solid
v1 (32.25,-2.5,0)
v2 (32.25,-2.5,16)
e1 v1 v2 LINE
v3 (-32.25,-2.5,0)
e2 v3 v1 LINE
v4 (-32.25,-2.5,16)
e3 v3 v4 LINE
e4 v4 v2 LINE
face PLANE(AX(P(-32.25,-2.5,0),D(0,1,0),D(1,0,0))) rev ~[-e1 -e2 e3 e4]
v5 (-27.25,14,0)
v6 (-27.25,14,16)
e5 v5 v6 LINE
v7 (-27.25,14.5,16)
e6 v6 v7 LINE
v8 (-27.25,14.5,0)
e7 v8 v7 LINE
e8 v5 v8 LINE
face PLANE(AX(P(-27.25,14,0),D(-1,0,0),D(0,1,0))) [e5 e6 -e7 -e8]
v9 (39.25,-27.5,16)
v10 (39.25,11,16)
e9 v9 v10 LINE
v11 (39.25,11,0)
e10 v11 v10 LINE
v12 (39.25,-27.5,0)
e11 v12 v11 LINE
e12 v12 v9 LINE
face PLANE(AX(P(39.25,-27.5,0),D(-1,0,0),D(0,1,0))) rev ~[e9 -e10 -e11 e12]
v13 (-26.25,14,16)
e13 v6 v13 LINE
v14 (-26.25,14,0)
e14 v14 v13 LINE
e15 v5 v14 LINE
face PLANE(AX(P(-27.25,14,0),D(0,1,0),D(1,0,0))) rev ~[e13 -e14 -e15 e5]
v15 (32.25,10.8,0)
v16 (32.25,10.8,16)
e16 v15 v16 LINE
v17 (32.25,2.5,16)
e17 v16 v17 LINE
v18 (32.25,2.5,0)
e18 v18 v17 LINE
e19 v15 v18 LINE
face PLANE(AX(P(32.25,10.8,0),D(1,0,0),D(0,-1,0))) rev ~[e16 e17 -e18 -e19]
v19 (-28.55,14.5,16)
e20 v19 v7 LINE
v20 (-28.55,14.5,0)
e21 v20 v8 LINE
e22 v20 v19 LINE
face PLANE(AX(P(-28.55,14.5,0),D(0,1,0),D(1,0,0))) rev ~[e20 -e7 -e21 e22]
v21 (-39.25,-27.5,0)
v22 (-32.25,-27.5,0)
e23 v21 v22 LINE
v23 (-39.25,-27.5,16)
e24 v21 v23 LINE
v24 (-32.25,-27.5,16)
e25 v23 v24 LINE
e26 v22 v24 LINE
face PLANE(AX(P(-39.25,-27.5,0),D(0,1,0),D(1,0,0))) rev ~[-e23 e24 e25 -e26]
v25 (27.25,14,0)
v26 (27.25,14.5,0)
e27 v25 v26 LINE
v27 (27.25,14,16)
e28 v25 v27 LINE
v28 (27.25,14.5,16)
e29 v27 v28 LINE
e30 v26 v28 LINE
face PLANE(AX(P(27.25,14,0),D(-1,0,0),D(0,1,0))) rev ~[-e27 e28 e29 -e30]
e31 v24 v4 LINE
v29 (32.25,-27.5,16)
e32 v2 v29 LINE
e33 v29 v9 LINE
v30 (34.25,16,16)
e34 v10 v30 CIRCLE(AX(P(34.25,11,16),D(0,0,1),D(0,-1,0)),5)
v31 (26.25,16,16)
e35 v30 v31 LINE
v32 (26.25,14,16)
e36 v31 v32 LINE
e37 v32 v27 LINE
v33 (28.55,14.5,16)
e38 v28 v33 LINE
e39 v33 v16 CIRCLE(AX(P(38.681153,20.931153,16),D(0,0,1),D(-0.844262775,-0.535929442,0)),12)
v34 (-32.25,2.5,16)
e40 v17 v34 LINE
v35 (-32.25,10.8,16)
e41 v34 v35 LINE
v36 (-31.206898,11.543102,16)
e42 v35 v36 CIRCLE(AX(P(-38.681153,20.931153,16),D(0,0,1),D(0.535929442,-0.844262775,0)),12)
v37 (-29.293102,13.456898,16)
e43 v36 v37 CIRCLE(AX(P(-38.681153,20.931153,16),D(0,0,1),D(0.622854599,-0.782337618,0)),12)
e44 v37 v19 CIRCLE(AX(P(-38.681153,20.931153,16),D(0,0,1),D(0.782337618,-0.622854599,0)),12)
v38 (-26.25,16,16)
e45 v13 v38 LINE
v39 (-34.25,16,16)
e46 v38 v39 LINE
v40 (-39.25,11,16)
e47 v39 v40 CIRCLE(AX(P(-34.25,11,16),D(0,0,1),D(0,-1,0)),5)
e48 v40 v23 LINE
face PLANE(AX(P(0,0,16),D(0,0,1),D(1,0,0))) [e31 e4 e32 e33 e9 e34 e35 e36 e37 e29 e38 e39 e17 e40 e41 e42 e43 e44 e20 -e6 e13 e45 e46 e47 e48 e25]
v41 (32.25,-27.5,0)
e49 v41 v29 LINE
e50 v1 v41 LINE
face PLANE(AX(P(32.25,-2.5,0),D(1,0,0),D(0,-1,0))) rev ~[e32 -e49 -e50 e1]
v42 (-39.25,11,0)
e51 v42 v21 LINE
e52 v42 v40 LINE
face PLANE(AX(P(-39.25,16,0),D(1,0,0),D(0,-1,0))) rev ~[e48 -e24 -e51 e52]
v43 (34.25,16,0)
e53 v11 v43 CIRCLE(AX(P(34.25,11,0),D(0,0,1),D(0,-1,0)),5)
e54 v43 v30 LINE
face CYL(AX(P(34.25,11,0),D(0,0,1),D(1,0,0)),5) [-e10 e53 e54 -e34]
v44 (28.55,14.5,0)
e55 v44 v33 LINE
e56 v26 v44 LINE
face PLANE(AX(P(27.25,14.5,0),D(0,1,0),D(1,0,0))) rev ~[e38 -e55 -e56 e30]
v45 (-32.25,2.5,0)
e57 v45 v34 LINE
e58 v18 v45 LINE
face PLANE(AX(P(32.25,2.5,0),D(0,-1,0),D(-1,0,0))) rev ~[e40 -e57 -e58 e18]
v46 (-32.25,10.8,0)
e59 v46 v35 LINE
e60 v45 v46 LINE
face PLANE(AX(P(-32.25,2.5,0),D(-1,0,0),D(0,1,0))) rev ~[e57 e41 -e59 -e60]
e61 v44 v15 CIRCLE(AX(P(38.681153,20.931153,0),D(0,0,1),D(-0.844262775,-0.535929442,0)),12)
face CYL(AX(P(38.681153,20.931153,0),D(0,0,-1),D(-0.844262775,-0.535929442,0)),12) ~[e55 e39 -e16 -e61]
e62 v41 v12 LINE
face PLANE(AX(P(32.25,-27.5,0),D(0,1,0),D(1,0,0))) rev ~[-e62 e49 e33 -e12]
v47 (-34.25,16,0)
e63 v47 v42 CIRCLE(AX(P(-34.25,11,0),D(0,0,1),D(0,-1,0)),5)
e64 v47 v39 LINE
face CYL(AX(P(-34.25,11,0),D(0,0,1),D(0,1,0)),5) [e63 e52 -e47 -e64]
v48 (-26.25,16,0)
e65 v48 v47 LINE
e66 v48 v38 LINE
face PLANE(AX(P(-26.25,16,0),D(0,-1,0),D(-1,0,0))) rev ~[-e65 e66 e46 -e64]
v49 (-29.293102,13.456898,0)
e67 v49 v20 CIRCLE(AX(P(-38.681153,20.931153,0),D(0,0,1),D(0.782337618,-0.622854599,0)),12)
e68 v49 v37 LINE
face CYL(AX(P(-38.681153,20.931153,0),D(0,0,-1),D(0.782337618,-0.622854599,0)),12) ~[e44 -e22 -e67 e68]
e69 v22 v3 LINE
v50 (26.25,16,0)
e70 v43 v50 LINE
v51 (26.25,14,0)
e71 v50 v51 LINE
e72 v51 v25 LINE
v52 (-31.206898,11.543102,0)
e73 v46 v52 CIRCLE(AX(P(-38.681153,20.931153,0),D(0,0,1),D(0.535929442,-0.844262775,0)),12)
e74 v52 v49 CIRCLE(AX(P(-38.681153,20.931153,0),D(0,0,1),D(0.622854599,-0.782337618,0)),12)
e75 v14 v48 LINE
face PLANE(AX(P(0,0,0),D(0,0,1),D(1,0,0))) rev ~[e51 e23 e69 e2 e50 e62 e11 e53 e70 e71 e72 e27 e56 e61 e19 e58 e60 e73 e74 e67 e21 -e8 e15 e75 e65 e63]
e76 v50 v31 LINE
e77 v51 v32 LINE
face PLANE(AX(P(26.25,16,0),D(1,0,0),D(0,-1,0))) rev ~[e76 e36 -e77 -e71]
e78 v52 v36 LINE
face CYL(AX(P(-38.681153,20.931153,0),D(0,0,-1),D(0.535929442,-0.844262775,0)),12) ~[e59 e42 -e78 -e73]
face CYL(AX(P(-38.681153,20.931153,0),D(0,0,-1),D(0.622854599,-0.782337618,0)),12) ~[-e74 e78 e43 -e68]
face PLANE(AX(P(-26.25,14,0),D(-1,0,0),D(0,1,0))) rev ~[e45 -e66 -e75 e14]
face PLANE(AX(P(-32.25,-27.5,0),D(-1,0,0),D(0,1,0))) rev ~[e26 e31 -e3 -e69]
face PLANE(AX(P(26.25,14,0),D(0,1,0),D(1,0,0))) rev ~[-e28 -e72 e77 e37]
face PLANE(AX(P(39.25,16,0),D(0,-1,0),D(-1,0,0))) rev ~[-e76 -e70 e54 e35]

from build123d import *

# Parameters (mm, degrees)
F0_W     = 1
F0_H     = 0.5
F1_DEPTH = 16
F2_R     = 5


with BuildPart() as f1:
    # F0 (on Top) → F1 (new body)
    with BuildSketch(Plane.XY):
        Polygon((32.25, -2.5), (32.25, 2.5), (28.25, 2.5), (-28.25, 2.5), (-32.25, 2.5), (-32.25, -2.5), align=None)
        Polygon((32.25, 10.8), (32.25, 2.5), (32.25, -2.5), (32.25, -27.5), (39.25, -27.5), (39.25, 14.5), (32.25, 14.5), align=None)
        with BuildLine():
            ThreePointArc((28.55, 14.5), (30.1958719271, 12.4458719271), (32.25, 10.8))
            Line((32.25, 10.8), (32.25, 14.5))
            Line((32.25, 14.5), (28.55, 14.5))
        make_face()
        Polygon((27.25, 14.5), (28.25, 14.5), (28.55, 14.5), (32.25, 14.5), (39.25, 14.5), (39.25, 16), (26.25, 16), (26.25, 14.5), align=None)
        Polygon((-32.25, -27.5), (-32.25, -2.5), (-32.25, 2.5), (-39.25, 2.5), (-39.25, -27.5), align=None)
        Polygon((-39.25, 2.5), (-32.25, 2.5), (-32.25, 10.5), (-32.25, 10.8), (-32.25, 14.5), (-39.25, 14.5), align=None)
        with Locations((26.75, 14.25)):
            Rectangle(F0_W, F0_H)
        Polygon((-28.55, 14.5), (-28.25, 14.5), (-27.25, 14.5), (-26.25, 14.5), (-26.25, 16), (-39.25, 16), (-39.25, 14.5), (-32.25, 14.5), align=None)
        with BuildLine():
            Line((-32.25, 14.5), (-32.25, 10.8))
            ThreePointArc((-32.25, 10.8), (-31.7185283382, 11.1576250938), (-31.2068981187, 11.5431018813))
            Line((-31.2068981187, 11.5431018813), (-29.2931018813, 13.4568981187))
            ThreePointArc((-29.2931018813, 13.4568981187), (-28.9076250938, 13.9685283382), (-28.55, 14.5))
            Line((-28.55, 14.5), (-32.25, 14.5))
        make_face()
        with Locations((-26.75, 14.25)):
            Rectangle(F0_W, F0_H)
        with BuildLine():
            Line((-29.2931018813, 13.4568981187), (-31.2068981187, 11.5431018813))
            ThreePointArc((-31.2068981187, 11.5431018813), (-30.1958719271, 12.4458719271), (-29.2931018813, 13.4568981187))
        make_face()
    extrude(amount=F1_DEPTH)

    # F2
    f2_edges = [f1.edges().sort_by_distance(p)[0] for p in [
        (-39.25, 16, 8),
        (39.25, 16, 8),
    ]]
    fillet(f2_edges, radius=F2_R)


solid = f1.part
